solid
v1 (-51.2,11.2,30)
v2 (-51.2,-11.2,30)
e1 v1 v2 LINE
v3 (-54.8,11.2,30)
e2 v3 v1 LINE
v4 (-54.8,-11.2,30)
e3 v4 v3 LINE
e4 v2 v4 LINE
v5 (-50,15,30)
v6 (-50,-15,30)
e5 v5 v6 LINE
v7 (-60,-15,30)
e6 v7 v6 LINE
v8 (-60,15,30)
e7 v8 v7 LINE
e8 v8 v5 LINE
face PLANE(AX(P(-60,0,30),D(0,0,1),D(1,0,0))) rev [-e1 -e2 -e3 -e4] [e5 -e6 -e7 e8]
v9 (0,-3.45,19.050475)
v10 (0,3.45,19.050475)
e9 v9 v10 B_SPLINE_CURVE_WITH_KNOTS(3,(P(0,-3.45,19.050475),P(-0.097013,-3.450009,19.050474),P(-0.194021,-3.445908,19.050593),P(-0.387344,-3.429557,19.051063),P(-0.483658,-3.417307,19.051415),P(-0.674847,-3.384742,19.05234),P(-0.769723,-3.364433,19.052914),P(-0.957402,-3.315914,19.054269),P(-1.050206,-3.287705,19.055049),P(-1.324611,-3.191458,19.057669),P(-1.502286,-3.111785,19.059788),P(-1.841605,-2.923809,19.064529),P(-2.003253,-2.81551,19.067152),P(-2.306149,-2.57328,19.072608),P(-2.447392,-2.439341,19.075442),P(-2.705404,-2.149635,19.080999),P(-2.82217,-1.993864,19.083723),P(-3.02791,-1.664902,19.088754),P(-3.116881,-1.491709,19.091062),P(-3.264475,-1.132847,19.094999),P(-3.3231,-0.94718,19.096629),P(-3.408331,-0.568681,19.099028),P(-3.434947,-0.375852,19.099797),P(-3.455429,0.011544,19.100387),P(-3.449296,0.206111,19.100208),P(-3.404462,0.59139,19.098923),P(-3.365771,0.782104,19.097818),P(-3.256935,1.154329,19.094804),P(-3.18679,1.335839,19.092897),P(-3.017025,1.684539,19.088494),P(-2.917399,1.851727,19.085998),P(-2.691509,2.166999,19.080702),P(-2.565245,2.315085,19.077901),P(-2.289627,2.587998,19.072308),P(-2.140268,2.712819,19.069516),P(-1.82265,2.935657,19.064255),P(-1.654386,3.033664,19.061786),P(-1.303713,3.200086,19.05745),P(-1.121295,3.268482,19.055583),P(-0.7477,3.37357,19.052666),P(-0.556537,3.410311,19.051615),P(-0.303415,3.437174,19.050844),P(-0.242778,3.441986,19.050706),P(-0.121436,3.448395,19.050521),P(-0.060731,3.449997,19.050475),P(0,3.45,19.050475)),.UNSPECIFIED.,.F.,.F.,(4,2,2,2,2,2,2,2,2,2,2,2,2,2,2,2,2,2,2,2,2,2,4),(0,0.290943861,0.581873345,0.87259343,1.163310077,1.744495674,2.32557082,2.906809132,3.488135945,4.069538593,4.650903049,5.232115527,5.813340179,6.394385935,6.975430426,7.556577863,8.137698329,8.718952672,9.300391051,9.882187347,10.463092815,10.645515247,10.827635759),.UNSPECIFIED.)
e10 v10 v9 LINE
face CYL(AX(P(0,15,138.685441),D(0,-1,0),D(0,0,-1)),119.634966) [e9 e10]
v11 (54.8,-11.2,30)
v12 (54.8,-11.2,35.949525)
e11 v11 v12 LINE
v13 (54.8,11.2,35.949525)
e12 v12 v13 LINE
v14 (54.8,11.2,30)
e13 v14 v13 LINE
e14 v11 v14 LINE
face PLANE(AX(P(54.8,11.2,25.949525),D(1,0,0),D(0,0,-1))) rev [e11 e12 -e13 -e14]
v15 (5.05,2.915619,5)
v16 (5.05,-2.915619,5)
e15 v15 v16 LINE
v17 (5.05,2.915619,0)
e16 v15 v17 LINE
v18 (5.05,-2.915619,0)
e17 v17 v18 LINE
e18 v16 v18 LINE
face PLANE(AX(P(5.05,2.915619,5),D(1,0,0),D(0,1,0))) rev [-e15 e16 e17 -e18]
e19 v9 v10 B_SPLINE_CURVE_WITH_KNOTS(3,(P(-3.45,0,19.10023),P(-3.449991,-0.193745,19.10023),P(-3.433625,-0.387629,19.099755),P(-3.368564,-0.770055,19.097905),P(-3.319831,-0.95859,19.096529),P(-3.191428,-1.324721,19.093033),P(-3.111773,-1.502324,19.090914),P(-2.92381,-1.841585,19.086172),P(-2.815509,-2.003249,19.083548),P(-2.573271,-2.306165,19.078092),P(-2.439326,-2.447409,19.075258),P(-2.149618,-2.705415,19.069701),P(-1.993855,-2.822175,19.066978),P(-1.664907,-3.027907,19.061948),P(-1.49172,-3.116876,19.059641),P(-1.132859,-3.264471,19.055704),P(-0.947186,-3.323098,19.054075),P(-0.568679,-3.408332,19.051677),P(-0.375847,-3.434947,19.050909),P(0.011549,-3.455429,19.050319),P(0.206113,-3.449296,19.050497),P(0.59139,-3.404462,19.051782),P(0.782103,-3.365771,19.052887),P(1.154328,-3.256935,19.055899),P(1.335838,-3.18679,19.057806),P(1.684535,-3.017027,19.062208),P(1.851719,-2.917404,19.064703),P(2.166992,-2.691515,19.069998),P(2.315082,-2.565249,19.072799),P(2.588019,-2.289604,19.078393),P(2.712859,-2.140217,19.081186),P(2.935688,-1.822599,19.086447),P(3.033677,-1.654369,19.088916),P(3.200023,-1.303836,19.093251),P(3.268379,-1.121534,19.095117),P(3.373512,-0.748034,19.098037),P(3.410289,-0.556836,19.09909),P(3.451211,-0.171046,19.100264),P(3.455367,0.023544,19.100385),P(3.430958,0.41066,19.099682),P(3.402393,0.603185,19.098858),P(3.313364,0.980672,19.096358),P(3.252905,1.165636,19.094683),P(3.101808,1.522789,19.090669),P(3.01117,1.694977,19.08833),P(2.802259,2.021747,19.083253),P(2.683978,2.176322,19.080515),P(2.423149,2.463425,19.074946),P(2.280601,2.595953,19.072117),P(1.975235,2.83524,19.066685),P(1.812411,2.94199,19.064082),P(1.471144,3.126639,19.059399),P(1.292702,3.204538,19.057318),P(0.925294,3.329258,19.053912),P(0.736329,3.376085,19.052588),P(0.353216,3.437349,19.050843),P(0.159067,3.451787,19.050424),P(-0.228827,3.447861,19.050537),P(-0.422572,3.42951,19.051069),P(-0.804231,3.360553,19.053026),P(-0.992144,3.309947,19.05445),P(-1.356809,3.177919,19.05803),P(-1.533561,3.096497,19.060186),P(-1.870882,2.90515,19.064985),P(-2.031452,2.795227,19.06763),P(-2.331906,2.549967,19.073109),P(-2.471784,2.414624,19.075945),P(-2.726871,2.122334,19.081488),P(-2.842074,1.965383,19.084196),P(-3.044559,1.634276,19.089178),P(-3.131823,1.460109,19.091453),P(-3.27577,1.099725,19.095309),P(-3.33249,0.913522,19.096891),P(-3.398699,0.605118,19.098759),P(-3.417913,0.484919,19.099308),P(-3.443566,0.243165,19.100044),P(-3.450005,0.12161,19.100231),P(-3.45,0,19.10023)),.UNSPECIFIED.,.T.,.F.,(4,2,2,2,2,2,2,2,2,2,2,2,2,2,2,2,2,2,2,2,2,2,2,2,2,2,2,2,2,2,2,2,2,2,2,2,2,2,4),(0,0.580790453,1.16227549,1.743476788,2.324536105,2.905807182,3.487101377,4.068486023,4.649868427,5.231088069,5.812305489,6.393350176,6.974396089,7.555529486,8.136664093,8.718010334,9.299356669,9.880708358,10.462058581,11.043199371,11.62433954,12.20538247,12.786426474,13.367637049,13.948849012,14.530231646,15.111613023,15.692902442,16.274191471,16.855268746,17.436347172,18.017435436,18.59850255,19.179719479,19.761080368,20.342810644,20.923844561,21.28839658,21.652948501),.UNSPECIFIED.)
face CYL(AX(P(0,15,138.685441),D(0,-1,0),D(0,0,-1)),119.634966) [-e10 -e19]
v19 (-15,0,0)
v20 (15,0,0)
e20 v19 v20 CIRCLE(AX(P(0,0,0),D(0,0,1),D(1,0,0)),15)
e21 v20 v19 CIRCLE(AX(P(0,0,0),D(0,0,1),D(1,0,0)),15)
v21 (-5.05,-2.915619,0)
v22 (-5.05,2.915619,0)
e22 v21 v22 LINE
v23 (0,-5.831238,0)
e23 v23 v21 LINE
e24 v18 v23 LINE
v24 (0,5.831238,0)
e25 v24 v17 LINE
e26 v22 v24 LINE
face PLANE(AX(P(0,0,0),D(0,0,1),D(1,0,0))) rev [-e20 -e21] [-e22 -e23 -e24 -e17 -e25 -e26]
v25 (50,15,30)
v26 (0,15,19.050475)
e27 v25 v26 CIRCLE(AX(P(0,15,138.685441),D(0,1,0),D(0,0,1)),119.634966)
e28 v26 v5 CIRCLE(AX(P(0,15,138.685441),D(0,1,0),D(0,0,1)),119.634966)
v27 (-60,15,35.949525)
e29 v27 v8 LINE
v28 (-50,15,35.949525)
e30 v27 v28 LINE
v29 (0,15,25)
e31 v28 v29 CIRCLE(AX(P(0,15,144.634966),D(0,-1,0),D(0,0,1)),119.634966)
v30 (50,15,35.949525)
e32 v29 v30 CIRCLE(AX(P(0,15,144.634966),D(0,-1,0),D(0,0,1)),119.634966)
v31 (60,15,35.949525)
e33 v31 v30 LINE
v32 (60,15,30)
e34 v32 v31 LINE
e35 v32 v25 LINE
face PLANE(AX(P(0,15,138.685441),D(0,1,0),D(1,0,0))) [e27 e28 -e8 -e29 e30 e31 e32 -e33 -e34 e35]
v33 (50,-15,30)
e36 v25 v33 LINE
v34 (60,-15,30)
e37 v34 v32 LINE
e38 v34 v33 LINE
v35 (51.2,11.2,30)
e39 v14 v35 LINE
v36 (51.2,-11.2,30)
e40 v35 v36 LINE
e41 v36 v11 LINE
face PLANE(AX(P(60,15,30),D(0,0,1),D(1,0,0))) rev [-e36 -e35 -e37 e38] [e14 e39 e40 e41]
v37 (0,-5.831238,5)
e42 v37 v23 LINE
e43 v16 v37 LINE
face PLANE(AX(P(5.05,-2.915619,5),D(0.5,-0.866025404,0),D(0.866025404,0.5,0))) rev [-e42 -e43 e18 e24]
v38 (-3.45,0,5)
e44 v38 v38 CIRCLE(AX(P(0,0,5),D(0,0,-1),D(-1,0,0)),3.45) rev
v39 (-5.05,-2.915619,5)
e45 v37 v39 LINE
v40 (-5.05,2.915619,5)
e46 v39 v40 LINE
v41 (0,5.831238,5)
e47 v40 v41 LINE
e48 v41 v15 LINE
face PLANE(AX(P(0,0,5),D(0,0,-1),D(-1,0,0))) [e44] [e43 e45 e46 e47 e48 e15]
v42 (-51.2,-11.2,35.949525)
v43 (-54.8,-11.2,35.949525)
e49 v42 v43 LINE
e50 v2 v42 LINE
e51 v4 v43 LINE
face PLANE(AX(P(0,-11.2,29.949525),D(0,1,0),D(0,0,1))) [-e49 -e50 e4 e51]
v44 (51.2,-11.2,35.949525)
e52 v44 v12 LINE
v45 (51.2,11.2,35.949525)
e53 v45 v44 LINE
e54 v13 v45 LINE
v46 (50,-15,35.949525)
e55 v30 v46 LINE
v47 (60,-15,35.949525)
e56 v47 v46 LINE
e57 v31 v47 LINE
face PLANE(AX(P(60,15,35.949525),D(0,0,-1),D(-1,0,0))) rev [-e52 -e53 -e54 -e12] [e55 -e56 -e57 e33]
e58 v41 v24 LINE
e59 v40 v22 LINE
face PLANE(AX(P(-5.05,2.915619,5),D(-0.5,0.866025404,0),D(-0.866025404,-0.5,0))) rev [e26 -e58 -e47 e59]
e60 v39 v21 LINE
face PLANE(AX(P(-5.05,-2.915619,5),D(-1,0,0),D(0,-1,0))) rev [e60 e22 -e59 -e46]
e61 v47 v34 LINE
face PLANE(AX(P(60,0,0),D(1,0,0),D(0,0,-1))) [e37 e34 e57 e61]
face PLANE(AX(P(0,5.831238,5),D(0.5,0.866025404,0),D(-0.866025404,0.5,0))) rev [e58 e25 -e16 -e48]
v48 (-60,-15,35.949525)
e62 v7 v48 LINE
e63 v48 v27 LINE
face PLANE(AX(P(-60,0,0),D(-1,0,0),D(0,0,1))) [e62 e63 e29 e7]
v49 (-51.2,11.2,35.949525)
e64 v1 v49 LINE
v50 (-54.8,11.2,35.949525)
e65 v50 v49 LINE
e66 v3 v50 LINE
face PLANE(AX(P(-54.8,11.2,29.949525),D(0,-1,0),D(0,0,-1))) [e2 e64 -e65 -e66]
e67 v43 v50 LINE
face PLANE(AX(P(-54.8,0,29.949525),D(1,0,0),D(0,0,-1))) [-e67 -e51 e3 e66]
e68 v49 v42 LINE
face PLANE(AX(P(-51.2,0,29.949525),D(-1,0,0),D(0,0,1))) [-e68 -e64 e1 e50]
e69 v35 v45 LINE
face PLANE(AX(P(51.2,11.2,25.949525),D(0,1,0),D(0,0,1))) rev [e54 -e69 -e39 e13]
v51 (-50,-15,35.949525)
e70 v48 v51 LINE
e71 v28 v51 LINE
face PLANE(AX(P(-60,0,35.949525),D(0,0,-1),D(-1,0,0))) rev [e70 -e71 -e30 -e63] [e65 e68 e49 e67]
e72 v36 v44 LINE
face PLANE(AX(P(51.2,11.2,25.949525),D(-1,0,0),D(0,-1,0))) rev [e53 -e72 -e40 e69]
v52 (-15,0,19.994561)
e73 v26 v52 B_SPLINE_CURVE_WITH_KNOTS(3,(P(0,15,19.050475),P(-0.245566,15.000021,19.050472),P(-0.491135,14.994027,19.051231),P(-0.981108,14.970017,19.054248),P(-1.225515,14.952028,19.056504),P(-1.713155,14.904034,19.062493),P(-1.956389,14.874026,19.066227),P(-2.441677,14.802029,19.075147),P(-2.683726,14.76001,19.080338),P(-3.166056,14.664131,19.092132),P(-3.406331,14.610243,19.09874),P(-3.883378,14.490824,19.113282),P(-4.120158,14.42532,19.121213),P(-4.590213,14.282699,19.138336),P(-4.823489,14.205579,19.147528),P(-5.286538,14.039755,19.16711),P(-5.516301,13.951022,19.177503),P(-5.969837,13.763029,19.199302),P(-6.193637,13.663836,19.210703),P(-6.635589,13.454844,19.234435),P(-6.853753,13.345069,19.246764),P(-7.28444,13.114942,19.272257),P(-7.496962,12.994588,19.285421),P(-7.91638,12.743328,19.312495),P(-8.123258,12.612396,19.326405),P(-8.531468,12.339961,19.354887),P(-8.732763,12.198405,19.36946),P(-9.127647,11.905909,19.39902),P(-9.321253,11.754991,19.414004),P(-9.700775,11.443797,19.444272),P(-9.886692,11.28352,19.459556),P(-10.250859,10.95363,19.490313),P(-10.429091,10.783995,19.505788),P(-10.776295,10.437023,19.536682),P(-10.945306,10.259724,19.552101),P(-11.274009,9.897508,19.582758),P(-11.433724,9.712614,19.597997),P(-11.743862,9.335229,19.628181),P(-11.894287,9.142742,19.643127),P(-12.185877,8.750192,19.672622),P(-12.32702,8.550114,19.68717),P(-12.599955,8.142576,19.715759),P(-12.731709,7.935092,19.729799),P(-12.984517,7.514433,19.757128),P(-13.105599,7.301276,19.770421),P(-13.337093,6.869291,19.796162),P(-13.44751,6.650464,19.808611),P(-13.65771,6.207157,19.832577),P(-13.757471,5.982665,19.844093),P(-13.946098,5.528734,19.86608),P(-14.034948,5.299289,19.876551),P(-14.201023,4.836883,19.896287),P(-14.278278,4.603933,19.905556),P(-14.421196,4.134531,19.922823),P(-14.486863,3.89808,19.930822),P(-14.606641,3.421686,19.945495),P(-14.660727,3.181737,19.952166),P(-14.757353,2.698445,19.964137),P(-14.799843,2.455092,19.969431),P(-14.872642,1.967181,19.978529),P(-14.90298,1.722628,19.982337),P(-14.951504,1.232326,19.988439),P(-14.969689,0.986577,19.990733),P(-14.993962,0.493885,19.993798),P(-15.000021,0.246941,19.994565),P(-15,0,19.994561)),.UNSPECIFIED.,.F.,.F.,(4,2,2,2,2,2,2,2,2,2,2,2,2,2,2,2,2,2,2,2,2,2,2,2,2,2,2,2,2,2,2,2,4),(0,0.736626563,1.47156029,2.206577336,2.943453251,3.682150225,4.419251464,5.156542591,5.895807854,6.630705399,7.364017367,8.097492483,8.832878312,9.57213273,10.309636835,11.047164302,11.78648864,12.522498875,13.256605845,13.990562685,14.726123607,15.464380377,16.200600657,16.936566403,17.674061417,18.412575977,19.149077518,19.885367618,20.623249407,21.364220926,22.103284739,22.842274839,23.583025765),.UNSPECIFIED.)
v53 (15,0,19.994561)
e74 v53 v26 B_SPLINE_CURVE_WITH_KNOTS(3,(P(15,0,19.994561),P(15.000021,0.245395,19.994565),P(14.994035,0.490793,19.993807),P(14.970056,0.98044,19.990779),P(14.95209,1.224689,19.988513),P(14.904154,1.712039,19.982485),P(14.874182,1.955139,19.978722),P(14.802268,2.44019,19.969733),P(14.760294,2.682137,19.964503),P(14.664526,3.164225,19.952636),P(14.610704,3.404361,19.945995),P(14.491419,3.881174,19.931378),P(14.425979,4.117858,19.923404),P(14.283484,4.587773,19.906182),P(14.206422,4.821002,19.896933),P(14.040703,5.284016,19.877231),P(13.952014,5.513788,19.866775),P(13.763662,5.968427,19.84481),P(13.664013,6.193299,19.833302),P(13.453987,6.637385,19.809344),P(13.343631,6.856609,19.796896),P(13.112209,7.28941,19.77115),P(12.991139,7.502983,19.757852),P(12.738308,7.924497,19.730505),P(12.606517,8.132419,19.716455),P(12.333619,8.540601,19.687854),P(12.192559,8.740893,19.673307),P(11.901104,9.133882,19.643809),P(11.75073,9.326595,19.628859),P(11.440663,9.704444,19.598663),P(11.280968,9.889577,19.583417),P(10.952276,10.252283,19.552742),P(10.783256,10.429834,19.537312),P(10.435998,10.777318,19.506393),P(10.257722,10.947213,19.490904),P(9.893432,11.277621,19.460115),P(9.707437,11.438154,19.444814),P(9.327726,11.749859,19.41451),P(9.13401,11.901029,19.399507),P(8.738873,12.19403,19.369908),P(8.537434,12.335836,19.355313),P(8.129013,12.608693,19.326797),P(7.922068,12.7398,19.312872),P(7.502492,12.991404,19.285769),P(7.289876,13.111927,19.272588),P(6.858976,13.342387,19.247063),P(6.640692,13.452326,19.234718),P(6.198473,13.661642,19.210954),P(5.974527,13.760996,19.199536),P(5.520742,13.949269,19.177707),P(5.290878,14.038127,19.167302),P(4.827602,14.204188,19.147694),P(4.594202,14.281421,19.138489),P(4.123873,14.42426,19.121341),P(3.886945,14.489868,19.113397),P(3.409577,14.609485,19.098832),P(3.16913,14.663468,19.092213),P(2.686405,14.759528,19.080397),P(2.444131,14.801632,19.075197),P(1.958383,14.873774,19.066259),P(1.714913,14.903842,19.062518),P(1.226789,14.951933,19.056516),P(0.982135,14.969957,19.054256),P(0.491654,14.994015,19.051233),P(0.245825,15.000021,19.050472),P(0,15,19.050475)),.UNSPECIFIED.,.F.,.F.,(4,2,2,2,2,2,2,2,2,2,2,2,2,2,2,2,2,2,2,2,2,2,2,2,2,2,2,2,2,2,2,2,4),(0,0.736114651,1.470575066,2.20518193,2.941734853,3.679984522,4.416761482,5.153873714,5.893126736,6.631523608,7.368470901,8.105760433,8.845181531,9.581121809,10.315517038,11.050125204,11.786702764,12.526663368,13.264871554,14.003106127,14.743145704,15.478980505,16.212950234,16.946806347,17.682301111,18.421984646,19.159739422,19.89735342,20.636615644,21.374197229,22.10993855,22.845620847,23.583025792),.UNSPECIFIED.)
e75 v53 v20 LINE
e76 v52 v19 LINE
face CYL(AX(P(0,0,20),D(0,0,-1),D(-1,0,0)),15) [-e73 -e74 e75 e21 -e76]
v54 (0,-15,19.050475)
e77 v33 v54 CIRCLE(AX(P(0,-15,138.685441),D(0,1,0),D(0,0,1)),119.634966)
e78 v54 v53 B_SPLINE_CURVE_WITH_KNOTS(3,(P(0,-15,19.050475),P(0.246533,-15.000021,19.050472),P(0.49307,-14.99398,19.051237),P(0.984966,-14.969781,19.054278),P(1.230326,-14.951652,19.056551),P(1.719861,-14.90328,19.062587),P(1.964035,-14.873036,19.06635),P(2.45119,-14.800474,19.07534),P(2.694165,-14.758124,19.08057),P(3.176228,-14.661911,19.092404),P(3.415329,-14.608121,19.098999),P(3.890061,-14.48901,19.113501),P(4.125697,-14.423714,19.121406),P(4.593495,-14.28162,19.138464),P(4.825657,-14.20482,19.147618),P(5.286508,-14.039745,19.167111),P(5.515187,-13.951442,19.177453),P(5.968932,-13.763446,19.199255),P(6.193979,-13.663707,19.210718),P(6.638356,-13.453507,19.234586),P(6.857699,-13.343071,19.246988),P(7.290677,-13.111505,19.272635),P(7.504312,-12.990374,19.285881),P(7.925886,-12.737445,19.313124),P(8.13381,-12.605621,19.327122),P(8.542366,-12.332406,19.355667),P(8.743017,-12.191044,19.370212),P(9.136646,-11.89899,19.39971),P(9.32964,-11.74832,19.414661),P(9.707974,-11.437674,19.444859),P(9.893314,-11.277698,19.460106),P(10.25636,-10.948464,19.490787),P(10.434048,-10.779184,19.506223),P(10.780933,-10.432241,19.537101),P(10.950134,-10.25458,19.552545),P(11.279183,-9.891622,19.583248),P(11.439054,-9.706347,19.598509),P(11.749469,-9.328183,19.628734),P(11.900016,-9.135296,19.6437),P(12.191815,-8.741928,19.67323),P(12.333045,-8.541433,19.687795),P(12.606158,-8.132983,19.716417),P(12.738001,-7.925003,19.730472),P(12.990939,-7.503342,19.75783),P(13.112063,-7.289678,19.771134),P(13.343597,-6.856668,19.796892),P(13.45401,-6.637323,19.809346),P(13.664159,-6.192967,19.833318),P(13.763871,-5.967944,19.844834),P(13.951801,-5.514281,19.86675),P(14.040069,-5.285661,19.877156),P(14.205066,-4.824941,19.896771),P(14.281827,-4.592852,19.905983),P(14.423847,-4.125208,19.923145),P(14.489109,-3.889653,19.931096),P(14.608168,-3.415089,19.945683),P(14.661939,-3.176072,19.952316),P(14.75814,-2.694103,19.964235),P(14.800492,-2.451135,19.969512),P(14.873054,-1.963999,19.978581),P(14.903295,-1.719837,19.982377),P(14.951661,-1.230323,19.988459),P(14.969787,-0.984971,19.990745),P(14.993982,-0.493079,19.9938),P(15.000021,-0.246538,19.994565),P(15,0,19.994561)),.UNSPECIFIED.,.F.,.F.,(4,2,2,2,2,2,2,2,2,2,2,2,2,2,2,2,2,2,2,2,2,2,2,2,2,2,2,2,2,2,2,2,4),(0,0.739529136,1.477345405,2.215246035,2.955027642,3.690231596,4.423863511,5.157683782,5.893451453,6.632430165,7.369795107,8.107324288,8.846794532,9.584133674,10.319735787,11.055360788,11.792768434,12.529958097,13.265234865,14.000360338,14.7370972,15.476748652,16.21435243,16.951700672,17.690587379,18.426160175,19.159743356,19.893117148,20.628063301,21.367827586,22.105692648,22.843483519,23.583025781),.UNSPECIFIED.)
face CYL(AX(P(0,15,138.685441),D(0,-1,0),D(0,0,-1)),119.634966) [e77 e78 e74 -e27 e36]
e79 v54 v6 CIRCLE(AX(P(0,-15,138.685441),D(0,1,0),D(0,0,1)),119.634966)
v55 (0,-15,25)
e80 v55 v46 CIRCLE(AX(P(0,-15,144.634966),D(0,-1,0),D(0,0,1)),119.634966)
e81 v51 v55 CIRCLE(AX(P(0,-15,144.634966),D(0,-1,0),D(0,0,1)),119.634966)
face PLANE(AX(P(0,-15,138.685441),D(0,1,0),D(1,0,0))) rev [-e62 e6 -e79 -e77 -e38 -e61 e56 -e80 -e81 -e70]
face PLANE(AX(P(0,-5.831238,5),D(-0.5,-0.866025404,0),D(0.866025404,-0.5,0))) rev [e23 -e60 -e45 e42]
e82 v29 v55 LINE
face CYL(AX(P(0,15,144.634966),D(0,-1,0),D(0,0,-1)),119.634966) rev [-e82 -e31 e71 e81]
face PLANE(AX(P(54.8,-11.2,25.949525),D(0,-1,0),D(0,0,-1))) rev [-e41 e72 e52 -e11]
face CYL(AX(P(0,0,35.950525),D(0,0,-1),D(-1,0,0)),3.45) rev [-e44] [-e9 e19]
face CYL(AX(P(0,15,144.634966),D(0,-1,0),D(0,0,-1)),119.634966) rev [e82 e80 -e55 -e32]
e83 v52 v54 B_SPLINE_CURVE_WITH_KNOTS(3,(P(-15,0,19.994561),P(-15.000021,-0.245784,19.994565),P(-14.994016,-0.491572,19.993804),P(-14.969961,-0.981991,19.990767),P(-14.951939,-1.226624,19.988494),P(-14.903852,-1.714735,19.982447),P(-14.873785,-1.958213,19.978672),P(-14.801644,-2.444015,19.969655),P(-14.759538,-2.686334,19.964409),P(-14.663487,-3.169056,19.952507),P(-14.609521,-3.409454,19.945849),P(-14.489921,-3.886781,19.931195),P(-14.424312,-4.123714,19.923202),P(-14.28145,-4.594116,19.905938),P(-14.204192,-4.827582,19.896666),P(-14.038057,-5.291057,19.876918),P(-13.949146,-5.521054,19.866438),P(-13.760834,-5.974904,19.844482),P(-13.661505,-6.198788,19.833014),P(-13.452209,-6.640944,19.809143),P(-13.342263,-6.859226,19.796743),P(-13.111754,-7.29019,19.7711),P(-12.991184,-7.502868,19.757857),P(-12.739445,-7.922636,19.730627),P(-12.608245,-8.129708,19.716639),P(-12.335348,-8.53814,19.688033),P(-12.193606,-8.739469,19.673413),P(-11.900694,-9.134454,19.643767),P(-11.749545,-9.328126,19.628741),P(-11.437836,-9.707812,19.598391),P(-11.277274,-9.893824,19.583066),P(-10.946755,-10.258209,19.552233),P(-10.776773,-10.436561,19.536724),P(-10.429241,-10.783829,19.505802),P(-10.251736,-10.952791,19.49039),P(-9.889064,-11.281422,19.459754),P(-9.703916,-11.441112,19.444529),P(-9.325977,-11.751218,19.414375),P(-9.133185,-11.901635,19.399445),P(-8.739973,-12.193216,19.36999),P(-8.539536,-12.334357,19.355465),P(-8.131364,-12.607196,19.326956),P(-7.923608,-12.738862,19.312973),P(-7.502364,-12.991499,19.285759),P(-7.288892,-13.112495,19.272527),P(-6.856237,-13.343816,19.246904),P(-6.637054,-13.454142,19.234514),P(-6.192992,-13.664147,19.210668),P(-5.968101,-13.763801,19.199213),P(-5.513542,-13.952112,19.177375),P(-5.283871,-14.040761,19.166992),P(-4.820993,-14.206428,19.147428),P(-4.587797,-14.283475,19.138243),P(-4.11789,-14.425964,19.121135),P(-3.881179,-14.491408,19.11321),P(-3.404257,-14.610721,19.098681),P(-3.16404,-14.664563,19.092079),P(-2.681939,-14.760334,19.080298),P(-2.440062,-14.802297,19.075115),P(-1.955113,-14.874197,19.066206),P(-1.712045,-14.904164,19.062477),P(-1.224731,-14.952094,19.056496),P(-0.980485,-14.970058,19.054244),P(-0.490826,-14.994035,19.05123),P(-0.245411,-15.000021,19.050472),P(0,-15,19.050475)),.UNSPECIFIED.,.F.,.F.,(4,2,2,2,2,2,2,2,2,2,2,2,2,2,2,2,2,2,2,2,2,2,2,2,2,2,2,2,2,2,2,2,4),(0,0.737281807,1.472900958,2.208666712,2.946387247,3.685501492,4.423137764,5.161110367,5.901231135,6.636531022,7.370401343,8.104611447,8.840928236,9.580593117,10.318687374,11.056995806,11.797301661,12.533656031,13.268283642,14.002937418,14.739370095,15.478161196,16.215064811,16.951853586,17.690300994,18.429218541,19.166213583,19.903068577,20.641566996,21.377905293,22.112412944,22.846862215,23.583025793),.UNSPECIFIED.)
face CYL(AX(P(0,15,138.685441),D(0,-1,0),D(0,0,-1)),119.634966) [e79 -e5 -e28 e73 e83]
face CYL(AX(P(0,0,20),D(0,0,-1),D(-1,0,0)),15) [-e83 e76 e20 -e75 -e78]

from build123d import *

# Parameters (mm, degrees)
BOSS_EXTRUDE1_START         = -15
BOSS_EXTRUDE1_DEPTH         = 30
BOSS_EXTRUDE1_START_2       = -12.7
BOSS_EXTRUDE1_2_OUTLINE_W   = 10
BOSS_EXTRUDE1_2_OUTLINE_H   = 5.949524979
BOSS_EXTRUDE1_2_DEPTH       = 25.4
BOSS_EXTRUDE1_3_OUTLINE_R   = 15
BOSS_EXTRUDE1_3_OUTLINE_R_2 = 4.55
BOSS_EXTRUDE1_3_DEPTH       = 19.994560744
SKETCH4_W                   = 3.6
SKETCH4_H                   = 22.4
CUT_EXTRUDE1_DEPTH          = 6
BOSS_EXTRUDE2_REACH         = 73.536
BOSS_EXTRUDE2_END_RADIUS    = 119.634966004
SKETCH9_R                   = 6.57997386
SKETCH9_R_2                 = 3.45
SKETCH10_W                  = 5.949524979
SKETCH10_H                  = 2.3
BOSS_EXTRUDE3_DEPTH         = 10
SKETCH11_W                  = 5.949524979
SKETCH11_H                  = 30
BOSS_EXTRUDE4_DEPTH         = 10
SKETCH13_W                  = 3.6
SKETCH13_H                  = 22.4
CUT_EXTRUDE2_DEPTH          = 10
CUT_EXTRUDE3_DEPTH          = 5


with BuildPart() as part:
    # Boss-Extrude1: read off the stored shape, not the designer's step
    # Boss-Extrude1 outline → Boss-Extrude1 (new body)
    with BuildSketch(Plane(origin=(0, 0, 0), x_dir=(1, 0, 0), z_dir=(0, 1, 0)).offset(BOSS_EXTRUDE1_START)):
        with BuildLine():
            Line((-50, -30), (-50, -35.949524979))
            ThreePointArc((-50, -35.949524979), (-25.592440765, -27.769436157), (0, -25))
            ThreePointArc((0, -25), (25.592440765, -27.769436157), (50, -35.949524979))
            Line((50, -35.949524979), (50, -30))
            ThreePointArc((50, -30), (27.810549479, -22.327809439), (4.550000287, -19.13702996))
            ThreePointArc((4.550000287, -19.13702996), (2.275411741, -19.072115713), (0, -19.050475021))
            ThreePointArc((0, -19.050475021), (-25.592440765, -21.819911178), (-50, -30))
        make_face()
    extrude(amount=BOSS_EXTRUDE1_DEPTH)

    # Boss-Extrude1 2 outline → Boss-Extrude1 2 (add)
    with BuildSketch(Plane(origin=(0, 0, 0), x_dir=(1, 0, 0), z_dir=(0, 1, 0)).offset(BOSS_EXTRUDE1_START_2)):
        with Locations((-55, -32.97476249)):
            Rectangle(BOSS_EXTRUDE1_2_OUTLINE_W, BOSS_EXTRUDE1_2_OUTLINE_H)
    extrude(amount=BOSS_EXTRUDE1_2_DEPTH)

    # Boss-Extrude1 3 outline → Boss-Extrude1 3 (add)
    with BuildSketch(Plane.XY):
        Circle(BOSS_EXTRUDE1_3_OUTLINE_R)
        Circle(BOSS_EXTRUDE1_3_OUTLINE_R_2, mode=Mode.SUBTRACT)
    extrude(amount=BOSS_EXTRUDE1_3_DEPTH)

    # Sketch4 → Cut-Extrude1 (cut)
    with BuildSketch(Plane.XY.offset(35.949524979)):
        with Locations((-53, 0)):
            Rectangle(SKETCH4_W, SKETCH4_H)
    extrude(amount=-CUT_EXTRUDE1_DEPTH, mode=Mode.SUBTRACT)

    # Boss-Extrude2: up to this cylinder (the profile starts outside it)
    boss_extrude2_end = Plane(origin=(0, 0, 138.685441025), z_dir=(0, -1, 0)) * Cylinder(BOSS_EXTRUDE2_END_RADIUS, 387.341932008, mode=Mode.PRIVATE)
    # Sketch9 → Boss-Extrude2 (add, up to the surface)
    with BuildSketch(Plane(origin=(0, 0, 0), x_dir=(-1, 0, 0), z_dir=(0, 0, -1)), mode=Mode.PRIVATE) as boss_extrude2_sk1:
        Circle(SKETCH9_R)
        Circle(SKETCH9_R_2, mode=Mode.SUBTRACT)
    boss_extrude2_tool1 = extrude(boss_extrude2_sk1.sketch, amount=-BOSS_EXTRUDE2_REACH, mode=Mode.PRIVATE) - boss_extrude2_end
    add(boss_extrude2_tool1.solids().sort_by_distance((6.393864, 0, 0))[0])

    # Sketch10 → Boss-Extrude3 (add)
    with BuildSketch(Plane.ZY.offset(50)):
        with Locations((32.97476249, 13.85)):
            Rectangle(SKETCH10_W, SKETCH10_H)
        with Locations((32.97476249, -13.85)):
            Rectangle(SKETCH10_W, SKETCH10_H)
    extrude(amount=BOSS_EXTRUDE3_DEPTH)

    # Sketch11 → Boss-Extrude4 (add)
    with BuildSketch(Plane(origin=(50, 0, 0), x_dir=(0, 0, -1), z_dir=(1, 0, 0))):
        with Locations((-32.97476249, 0)):
            Rectangle(SKETCH11_W, SKETCH11_H)
    extrude(amount=BOSS_EXTRUDE4_DEPTH)

    # Sketch13 → Cut-Extrude2 (cut)
    with BuildSketch(Plane.XY.offset(35.949524979)):
        with Locations((53, 0)):
            Rectangle(SKETCH13_W, SKETCH13_H)
    extrude(amount=-CUT_EXTRUDE2_DEPTH, mode=Mode.SUBTRACT)

    # Sketch15 → Cut-Extrude3 (cut)
    with BuildSketch(Plane(origin=(0, 0, 0), x_dir=(-1, 0, 0), z_dir=(0, 0, -1))):
        Polygon((0, 5.831237719), (-5.05, 2.915618859), (-5.05, -2.915618859), (0, -5.831237719), (5.05, -2.915618859), (5.05, 2.915618859), align=None)
    extrude(amount=-CUT_EXTRUDE3_DEPTH, mode=Mode.SUBTRACT)


solid = part.part
